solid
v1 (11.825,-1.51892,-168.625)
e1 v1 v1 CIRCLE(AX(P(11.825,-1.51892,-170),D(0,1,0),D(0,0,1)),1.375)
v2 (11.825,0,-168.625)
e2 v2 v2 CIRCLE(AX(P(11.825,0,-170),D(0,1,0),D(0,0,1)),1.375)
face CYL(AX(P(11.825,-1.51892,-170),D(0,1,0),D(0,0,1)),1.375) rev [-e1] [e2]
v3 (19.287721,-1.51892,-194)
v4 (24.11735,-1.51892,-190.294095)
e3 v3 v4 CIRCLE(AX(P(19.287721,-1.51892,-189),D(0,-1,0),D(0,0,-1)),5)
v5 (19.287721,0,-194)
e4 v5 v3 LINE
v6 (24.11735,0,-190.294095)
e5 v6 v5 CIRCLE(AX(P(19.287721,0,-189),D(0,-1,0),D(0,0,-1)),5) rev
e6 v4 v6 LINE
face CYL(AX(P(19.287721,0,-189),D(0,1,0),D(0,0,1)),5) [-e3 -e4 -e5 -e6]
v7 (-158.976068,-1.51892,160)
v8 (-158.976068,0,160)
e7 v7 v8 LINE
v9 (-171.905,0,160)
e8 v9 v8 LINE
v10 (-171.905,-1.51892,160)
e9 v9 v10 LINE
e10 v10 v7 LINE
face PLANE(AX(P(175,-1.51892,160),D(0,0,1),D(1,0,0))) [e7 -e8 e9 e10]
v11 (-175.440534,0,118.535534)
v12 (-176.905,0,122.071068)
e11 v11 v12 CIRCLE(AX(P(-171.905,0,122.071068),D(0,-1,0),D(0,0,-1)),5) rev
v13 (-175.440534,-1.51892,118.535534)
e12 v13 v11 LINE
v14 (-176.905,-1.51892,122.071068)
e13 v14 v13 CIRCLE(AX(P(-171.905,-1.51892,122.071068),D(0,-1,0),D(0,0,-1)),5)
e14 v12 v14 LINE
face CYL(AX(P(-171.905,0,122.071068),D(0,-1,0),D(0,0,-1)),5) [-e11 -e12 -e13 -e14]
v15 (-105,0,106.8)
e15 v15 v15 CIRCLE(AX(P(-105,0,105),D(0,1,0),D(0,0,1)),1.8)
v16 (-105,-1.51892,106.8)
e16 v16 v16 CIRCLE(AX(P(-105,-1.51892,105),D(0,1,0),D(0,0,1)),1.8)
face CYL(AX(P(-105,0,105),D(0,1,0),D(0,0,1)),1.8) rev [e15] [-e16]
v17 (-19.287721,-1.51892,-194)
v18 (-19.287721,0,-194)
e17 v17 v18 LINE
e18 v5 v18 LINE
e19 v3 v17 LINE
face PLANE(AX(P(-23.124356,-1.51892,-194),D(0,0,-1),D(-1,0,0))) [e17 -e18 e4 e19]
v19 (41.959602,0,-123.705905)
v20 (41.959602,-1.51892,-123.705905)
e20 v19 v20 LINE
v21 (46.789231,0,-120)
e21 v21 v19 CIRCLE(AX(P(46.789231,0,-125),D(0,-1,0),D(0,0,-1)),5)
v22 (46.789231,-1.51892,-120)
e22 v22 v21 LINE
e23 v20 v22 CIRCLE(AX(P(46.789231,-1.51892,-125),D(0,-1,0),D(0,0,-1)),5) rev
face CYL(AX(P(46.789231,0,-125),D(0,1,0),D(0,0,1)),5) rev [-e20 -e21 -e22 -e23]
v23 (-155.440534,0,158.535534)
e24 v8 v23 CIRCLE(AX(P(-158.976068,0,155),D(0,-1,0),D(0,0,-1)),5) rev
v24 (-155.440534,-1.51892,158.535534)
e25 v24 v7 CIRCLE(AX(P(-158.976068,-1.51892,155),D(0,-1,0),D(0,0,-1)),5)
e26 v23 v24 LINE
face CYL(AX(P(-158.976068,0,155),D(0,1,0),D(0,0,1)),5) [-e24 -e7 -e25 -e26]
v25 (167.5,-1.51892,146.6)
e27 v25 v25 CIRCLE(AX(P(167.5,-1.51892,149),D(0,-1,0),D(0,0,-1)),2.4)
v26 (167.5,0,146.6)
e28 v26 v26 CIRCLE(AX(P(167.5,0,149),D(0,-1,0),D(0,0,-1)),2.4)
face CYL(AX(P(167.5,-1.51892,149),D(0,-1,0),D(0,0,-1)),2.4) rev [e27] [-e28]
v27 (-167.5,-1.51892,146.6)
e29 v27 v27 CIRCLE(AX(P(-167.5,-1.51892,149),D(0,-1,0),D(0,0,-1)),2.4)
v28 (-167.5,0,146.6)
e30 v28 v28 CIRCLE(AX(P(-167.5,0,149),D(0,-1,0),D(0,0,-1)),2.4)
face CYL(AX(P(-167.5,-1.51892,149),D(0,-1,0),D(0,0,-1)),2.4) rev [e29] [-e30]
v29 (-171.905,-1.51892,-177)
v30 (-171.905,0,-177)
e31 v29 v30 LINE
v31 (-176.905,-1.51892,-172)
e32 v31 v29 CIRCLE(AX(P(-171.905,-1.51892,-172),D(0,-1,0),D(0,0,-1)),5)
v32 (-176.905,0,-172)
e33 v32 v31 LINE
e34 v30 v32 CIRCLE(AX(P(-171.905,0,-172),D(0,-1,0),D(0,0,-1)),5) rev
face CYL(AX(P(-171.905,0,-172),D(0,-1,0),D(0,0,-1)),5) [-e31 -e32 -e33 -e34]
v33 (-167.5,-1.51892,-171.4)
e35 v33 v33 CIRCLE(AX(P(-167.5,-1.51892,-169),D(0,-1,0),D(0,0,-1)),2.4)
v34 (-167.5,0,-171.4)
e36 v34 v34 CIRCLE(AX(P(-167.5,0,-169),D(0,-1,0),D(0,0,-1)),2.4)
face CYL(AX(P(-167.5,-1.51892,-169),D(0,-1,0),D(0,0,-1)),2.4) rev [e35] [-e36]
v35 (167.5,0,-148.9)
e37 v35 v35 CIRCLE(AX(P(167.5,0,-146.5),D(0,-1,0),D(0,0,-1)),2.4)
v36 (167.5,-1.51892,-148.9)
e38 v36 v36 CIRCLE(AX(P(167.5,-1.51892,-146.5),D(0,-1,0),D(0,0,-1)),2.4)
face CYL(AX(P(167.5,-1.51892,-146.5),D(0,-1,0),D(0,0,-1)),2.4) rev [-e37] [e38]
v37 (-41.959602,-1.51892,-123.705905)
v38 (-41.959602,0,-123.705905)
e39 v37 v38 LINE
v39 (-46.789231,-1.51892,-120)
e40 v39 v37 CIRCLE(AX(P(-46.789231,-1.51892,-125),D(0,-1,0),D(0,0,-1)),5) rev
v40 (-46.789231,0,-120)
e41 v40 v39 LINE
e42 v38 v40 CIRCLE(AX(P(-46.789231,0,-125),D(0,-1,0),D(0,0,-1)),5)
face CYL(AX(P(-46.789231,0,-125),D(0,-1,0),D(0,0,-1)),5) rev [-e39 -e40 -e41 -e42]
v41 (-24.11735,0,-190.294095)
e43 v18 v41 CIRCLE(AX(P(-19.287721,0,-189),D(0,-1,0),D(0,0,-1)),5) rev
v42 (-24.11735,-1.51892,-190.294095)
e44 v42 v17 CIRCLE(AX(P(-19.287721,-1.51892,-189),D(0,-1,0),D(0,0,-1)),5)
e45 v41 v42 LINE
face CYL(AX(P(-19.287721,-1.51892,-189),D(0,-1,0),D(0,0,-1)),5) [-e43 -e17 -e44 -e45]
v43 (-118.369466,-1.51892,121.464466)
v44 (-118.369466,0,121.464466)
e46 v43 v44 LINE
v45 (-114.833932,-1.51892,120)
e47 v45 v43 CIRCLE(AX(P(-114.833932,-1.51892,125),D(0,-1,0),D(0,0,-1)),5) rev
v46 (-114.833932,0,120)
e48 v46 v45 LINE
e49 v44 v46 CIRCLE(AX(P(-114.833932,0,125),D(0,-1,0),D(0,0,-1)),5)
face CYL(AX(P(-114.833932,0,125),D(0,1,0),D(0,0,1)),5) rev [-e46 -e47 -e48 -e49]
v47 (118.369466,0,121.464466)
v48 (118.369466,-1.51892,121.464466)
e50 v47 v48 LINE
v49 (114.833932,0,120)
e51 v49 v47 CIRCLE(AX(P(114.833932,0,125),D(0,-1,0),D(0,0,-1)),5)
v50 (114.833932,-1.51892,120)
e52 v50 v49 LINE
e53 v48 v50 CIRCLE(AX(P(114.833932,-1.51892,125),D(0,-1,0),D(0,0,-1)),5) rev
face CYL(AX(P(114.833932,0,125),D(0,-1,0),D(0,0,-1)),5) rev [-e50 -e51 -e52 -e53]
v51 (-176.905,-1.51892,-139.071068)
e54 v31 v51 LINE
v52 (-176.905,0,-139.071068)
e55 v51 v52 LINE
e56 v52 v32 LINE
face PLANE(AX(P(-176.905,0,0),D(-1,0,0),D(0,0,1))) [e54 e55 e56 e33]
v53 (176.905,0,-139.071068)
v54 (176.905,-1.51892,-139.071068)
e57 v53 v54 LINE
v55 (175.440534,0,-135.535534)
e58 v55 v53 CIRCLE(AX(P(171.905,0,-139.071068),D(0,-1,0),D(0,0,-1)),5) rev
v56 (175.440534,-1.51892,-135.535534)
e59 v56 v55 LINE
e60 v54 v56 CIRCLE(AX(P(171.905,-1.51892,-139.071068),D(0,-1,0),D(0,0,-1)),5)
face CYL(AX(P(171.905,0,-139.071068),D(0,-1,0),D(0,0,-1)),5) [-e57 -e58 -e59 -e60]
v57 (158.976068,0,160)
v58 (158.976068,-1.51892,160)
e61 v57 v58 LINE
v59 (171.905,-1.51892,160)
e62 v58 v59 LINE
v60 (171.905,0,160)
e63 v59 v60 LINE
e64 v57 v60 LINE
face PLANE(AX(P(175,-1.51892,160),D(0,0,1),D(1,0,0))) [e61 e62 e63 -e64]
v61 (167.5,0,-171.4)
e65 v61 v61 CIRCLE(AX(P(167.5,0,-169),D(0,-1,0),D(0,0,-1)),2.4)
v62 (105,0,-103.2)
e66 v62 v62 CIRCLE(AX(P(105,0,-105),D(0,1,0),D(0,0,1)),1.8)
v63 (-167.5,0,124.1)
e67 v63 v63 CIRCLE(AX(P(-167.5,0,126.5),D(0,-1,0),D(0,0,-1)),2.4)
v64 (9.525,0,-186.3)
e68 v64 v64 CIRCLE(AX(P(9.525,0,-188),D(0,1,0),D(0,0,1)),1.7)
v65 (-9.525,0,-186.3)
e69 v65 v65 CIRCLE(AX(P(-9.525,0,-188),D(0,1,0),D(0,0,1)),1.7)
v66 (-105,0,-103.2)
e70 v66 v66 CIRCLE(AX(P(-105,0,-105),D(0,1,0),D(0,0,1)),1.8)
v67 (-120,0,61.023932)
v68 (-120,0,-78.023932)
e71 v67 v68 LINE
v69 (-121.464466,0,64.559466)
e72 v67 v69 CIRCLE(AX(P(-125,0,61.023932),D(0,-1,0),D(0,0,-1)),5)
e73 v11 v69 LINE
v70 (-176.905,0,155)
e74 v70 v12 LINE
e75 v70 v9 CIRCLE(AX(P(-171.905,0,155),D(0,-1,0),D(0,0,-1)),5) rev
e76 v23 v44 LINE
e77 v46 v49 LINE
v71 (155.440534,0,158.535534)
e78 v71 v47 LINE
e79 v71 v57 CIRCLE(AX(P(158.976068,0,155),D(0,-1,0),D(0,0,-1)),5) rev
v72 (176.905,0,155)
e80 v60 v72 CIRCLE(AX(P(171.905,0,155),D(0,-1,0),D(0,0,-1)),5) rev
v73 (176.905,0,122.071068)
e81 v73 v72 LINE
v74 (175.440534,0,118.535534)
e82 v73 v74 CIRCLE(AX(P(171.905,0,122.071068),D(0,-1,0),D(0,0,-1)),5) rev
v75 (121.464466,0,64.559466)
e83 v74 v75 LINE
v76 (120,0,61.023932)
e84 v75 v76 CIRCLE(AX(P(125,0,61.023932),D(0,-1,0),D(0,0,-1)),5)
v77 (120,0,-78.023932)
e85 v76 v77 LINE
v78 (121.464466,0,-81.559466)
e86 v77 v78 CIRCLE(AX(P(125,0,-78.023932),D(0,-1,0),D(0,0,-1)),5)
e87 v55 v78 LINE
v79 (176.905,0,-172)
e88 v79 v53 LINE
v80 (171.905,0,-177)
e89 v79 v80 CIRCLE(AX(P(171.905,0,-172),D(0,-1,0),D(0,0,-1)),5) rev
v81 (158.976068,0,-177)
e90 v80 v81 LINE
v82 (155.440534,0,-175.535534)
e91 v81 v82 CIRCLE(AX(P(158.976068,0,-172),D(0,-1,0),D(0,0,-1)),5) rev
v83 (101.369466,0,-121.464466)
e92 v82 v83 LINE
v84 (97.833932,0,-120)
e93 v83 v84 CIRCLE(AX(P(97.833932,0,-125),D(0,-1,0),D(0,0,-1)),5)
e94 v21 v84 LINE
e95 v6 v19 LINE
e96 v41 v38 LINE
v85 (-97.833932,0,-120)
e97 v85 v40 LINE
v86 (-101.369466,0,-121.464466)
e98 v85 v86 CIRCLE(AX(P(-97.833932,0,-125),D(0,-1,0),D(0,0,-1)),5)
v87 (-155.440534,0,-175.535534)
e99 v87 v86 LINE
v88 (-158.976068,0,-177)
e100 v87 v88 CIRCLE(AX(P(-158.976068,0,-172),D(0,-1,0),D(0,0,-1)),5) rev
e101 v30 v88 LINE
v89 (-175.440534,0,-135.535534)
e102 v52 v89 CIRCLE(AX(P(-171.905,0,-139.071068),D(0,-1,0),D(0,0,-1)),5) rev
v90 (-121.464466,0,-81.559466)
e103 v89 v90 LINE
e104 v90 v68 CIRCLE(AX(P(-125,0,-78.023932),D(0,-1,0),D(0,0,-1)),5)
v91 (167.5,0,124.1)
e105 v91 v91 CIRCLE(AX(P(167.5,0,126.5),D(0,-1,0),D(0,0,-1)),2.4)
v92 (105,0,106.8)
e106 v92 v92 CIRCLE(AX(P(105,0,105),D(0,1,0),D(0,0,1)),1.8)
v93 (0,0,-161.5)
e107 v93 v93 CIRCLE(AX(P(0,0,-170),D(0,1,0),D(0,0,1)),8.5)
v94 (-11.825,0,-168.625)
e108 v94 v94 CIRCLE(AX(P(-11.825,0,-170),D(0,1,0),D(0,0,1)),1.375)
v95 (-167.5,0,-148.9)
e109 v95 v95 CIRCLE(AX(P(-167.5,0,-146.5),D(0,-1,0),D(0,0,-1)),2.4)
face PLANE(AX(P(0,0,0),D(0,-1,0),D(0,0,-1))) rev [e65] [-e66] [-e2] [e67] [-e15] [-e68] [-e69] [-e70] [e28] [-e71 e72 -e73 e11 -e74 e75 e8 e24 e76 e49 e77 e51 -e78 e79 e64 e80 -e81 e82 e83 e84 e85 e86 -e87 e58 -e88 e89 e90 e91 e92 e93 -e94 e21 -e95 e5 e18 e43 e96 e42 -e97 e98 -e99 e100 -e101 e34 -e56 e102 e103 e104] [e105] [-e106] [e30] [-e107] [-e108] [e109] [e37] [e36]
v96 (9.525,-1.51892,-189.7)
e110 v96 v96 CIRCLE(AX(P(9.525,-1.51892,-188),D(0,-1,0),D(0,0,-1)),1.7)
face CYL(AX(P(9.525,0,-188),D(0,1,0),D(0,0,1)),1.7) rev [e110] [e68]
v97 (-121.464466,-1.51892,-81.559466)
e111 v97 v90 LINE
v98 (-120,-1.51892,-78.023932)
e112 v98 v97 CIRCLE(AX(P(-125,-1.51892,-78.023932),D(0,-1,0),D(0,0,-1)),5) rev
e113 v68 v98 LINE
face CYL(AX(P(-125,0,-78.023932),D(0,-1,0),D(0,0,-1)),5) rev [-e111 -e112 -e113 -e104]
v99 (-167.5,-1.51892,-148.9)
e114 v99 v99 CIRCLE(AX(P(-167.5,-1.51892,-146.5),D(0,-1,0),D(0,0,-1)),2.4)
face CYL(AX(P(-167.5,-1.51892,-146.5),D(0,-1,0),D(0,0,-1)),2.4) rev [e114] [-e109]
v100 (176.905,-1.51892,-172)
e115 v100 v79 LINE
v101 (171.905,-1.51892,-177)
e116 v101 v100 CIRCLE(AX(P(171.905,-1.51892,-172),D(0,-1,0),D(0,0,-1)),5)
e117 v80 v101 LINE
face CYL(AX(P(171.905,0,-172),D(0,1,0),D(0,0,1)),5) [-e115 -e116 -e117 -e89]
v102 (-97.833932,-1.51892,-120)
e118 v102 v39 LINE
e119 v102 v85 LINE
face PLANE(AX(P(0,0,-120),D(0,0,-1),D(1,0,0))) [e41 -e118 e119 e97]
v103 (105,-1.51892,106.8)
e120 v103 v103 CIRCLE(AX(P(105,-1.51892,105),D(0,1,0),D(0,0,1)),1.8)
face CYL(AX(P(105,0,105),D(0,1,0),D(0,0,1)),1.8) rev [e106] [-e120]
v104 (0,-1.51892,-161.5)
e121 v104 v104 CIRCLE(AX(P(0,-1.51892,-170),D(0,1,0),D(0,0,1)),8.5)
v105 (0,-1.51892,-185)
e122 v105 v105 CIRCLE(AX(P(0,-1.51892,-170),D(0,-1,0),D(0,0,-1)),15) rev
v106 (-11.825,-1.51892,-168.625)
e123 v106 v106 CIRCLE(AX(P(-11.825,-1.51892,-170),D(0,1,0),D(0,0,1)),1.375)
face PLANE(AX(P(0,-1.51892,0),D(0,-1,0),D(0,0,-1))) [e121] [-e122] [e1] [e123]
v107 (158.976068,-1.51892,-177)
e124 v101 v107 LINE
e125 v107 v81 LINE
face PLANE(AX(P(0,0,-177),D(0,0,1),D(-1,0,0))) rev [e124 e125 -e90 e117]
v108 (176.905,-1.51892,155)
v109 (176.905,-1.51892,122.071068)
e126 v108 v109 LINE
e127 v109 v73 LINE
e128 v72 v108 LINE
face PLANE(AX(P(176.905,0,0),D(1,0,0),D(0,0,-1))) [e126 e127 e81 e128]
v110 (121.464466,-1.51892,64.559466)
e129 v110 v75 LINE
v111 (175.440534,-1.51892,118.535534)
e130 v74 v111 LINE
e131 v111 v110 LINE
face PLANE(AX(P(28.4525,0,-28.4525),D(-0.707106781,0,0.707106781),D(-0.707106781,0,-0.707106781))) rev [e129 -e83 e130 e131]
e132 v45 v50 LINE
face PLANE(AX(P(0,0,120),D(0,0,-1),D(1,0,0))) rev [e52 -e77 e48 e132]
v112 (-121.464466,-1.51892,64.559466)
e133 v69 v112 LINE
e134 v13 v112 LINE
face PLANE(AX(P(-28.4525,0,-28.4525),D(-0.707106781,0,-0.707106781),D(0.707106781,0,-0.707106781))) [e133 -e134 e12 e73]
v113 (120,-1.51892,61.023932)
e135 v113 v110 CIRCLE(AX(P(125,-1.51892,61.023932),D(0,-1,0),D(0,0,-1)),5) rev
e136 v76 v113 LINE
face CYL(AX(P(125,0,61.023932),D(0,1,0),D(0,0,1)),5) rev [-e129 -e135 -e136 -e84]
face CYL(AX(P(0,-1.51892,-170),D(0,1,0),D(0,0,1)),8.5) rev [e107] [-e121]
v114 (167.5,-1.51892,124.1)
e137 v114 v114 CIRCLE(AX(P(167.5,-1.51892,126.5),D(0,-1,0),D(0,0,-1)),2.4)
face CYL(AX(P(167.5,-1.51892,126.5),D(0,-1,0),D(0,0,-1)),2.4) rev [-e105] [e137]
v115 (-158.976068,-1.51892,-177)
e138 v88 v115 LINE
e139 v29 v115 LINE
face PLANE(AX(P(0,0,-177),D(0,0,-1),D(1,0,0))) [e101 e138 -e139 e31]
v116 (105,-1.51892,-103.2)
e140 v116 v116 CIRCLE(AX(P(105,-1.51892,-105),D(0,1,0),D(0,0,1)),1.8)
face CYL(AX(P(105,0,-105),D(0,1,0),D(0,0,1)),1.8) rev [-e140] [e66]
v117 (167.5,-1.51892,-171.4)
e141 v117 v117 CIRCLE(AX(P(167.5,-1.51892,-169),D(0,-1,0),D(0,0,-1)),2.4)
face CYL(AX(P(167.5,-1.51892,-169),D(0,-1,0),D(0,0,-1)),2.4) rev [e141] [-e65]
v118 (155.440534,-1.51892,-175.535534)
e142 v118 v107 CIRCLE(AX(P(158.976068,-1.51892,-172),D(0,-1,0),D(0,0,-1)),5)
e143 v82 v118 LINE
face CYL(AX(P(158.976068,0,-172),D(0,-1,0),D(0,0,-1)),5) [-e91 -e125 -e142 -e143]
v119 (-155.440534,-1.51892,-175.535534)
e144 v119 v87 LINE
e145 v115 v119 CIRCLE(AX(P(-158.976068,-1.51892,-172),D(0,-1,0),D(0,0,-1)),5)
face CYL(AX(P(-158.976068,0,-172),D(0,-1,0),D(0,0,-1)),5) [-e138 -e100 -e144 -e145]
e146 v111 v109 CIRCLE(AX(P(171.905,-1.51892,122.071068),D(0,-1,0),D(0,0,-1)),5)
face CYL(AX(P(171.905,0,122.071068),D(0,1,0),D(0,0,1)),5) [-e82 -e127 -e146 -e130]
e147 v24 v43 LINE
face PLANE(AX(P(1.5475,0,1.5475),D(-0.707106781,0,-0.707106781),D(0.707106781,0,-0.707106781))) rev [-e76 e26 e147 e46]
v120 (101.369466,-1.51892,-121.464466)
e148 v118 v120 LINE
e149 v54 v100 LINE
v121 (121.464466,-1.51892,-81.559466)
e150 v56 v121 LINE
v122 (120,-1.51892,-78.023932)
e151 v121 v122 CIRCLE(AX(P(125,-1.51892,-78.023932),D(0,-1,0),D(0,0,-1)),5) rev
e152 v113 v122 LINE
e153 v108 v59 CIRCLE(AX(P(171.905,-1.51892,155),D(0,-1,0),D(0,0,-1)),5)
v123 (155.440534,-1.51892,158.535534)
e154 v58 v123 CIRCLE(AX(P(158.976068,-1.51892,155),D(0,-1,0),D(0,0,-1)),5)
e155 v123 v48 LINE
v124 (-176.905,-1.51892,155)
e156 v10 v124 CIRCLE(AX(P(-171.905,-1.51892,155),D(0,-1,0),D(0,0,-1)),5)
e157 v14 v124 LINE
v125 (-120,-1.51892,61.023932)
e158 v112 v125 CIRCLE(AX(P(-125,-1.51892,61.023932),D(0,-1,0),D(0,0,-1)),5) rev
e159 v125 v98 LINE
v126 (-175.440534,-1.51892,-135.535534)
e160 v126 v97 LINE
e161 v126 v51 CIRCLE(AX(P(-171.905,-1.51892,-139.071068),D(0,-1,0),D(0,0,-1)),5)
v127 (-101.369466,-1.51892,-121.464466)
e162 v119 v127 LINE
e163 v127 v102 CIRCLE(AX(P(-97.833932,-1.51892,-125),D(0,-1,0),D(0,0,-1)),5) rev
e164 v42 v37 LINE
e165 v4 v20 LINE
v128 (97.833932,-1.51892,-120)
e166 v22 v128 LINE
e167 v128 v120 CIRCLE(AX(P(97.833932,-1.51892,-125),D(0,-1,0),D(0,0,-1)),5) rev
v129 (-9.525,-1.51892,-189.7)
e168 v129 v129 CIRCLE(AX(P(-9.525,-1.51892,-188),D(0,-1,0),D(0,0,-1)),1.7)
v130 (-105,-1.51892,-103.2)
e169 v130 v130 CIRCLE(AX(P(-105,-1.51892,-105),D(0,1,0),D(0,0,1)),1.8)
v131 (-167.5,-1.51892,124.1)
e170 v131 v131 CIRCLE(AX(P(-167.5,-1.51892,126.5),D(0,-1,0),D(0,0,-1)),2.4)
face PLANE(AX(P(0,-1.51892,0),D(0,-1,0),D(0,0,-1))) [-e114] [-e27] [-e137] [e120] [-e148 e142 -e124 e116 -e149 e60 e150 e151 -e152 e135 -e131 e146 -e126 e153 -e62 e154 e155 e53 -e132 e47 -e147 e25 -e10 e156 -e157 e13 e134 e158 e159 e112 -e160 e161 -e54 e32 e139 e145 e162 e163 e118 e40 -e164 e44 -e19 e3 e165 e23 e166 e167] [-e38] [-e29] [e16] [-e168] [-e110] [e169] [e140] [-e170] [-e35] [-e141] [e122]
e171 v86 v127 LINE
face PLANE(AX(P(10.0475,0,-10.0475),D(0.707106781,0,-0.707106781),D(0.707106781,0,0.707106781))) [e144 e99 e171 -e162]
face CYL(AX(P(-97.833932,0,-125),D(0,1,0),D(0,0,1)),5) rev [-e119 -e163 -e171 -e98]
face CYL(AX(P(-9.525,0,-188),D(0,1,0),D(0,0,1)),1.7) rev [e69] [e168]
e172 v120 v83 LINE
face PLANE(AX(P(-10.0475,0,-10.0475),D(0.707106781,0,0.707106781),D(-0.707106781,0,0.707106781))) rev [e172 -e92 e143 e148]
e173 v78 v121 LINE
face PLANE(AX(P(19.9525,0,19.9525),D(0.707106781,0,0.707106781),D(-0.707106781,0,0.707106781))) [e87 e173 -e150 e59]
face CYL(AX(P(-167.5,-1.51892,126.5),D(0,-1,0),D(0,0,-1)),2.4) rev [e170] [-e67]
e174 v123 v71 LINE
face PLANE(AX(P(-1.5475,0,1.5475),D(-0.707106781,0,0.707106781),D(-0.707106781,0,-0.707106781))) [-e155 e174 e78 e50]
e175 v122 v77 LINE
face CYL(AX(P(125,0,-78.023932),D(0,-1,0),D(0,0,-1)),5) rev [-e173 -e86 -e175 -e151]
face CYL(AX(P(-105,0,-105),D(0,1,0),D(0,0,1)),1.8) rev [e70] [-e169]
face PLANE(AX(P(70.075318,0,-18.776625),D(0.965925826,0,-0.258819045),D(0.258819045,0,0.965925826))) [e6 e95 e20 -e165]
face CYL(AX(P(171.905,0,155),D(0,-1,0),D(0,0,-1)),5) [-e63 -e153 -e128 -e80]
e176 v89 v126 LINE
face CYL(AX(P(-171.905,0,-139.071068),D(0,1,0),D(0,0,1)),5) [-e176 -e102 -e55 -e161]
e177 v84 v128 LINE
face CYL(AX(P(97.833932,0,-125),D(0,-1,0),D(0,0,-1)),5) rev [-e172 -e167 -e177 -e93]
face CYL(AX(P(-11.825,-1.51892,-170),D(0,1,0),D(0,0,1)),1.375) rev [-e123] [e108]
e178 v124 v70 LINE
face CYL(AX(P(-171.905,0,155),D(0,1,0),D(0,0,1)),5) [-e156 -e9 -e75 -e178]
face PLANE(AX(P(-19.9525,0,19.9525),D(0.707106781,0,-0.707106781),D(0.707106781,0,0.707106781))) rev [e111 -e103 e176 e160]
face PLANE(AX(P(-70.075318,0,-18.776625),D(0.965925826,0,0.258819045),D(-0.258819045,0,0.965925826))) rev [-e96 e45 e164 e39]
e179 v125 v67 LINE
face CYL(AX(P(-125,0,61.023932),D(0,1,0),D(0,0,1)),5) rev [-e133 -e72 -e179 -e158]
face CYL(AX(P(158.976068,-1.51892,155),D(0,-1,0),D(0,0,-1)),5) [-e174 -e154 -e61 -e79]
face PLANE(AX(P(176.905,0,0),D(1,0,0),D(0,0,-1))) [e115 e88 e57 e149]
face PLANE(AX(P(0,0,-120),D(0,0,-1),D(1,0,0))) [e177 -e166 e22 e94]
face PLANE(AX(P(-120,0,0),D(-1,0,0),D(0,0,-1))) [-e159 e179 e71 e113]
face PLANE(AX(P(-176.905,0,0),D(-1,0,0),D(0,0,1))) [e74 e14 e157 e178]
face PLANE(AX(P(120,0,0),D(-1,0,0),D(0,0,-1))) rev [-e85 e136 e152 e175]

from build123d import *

# Parameters (mm, degrees)
SKETCH1_W            = 350
SKETCH1_H            = 347
BASE_FLANGE1_DEPTH   = 1.51892
M3_CLEARANCE_HOLE1_D = 3.6
M4_CLEARANCE_HOLE1_D = 4.8
SKETCH13_R           = 8.5
SKETCH13_R_2         = 1.375
CUT_EXTRUDE1_DEPTH   = 1.51892
SKETCH41_W           = 347
SKETCH41_H           = 1.51892
BOSS_EXTRUDE4_DEPTH  = 1.905
SKETCH42_W           = 347
SKETCH42_H           = 1.51892
BOSS_EXTRUDE5_DEPTH  = 1.905
CUT_EXTRUDE2_DEPTH   = 1.51892
BOSS_EXTRUDE6_DEPTH  = 1.51892
CLEARANCE_HOLE2_D    = 3.4
FILLET2_R            = 5


# Sheet-metal steps are written as plain solids
with BuildPart() as part:
    # Sketch1 → Base-Flange1 (new body)
    with BuildSketch(Plane(origin=(0, 0, 0), x_dir=(1, 0, 0), z_dir=(0, 1, 0))):
        with Locations((0, 13.5)):
            Rectangle(SKETCH1_W, SKETCH1_H)
    extrude(amount=-BASE_FLANGE1_DEPTH)

    # M3 Clearance Hole1 (through all)
    with Locations(Plane(origin=(0, 0, 0), x_dir=(1, 0, 0), z_dir=(0, 1, 0))):
        with Locations((-105, 105), (105, 105), (105, -105), (-105, -105)):
            Hole(M3_CLEARANCE_HOLE1_D / 2)

    # M4 Clearance Hole1 (through all)
    with Locations(Plane(origin=(0, -1.51892, 0), x_dir=(-1, 0, 0), z_dir=(0, -1, 0))):
        with Locations((167.5, 146.5), (167.5, 169), (-167.5, 146.5), (-167.5, 169), (-167.5, -149), (-167.5, -126.5), (167.5, -149), (167.5, -126.5)):
            Hole(M4_CLEARANCE_HOLE1_D / 2)

    # Sketch13 → Cut-Extrude1 (cut)
    with BuildSketch(Plane(origin=(0, 0, 0), x_dir=(1, 0, 0), z_dir=(0, 1, 0))):
        with Locations(Location((0, 170, 0), (0, 0, 270))):
            Circle(SKETCH13_R)
        with Locations(Location((-11.825, 170, 0), (0, 0, 270))):
            Circle(SKETCH13_R_2)
        with Locations(Location((11.825, 170, 0), (0, 0, 270))):
            Circle(SKETCH13_R_2)
    extrude(amount=-CUT_EXTRUDE1_DEPTH, mode=Mode.SUBTRACT)

    # Sketch41 → Boss-Extrude4 (add)
    with BuildSketch(Plane(origin=(175, 0, 0), x_dir=(0, 0, -1), z_dir=(1, 0, 0))):
        with Locations((13.5, -0.75946)):
            Rectangle(SKETCH41_W, SKETCH41_H)
    extrude(amount=BOSS_EXTRUDE4_DEPTH)

    # Sketch42 → Boss-Extrude5 (add)
    with BuildSketch(Plane.ZY.offset(175)):
        with Locations((-13.5, -0.75946)):
            Rectangle(SKETCH42_W, SKETCH42_H)
    extrude(amount=BOSS_EXTRUDE5_DEPTH)

    # Sketch43 → Cut-Extrude2 (cut)
    with BuildSketch(Plane(origin=(0, 0, 0), x_dir=(1, 0, 0), z_dir=(0, 1, 0))):
        Polygon((-176.905, -120), (-120, -63.095), (-120, 80.095), (-176.905, 137), align=None)
        Polygon((-156.905, 177), (-99.905, 120), (-42.952595893, 120), (-25, 187), (-176.905, 187), (-176.905, 177), align=None)
        Polygon((25, 187), (42.952595893, 120), (99.905, 120), (156.905, 177), (176.905, 177), (176.905, 187), align=None)
        Polygon((120, 80.095), (120, -63.095), (176.905, -120), (176.905, 137), align=None)
        Polygon((116.905, -120), (-116.905, -120), (-156.905, -160), (156.905, -160), align=None)
    extrude(amount=-CUT_EXTRUDE2_DEPTH, mode=Mode.SUBTRACT)

    # Sketch45 → Boss-Extrude6 (add)
    with BuildSketch(Plane(origin=(0, 0, 0), x_dir=(1, 0, 0), z_dir=(0, 1, 0))):
        Polygon((-25, 187), (-23.124355653, 194), (23.124355653, 194), (25, 187), align=None)
    extrude(amount=-BOSS_EXTRUDE6_DEPTH)

    # Clearance Hole2 (through all)
    with Locations(Plane(origin=(0, 0, 0), x_dir=(1, 0, 0), z_dir=(0, 1, 0))):
        with Locations((-9.525, 188), (9.525, 188)):
            Hole(CLEARANCE_HOLE2_D / 2)

    # Fillet2
    fillet2_edges = [part.edges().sort_by_distance(p)[0] for p in [
        (176.905, -0.75946, 160),
        (-176.905, -0.75946, 160),
        (176.905, -0.75946, -177),
        (42.952595893, -0.75946, -120),
        (99.905, -0.75946, -120),
        (156.905, -0.75946, -177),
        (176.905, -0.75946, 120),
        (176.905, -0.75946, -137),
        (120, -0.75946, -80.095),
        (120, -0.75946, 63.095),
        (-176.905, -0.75946, -137),
        (-176.905, -0.75946, 120),
        (-120, -0.75946, 63.095),
        (-120, -0.75946, -80.095),
        (-176.905, -0.75946, -177),
        (-156.905, -0.75946, -177),
        (-99.905, -0.75946, -120),
        (-42.952595893, -0.75946, -120),
        (-156.905, -0.75946, 160),
        (156.905, -0.75946, 160),
        (116.905, -0.75946, 120),
        (-116.905, -0.75946, 120),
        (-23.124355653, -0.75946, -194),
        (23.124355653, -0.75946, -194),
    ]]
    fillet(fillet2_edges, radius=FILLET2_R)


solid = part.part
